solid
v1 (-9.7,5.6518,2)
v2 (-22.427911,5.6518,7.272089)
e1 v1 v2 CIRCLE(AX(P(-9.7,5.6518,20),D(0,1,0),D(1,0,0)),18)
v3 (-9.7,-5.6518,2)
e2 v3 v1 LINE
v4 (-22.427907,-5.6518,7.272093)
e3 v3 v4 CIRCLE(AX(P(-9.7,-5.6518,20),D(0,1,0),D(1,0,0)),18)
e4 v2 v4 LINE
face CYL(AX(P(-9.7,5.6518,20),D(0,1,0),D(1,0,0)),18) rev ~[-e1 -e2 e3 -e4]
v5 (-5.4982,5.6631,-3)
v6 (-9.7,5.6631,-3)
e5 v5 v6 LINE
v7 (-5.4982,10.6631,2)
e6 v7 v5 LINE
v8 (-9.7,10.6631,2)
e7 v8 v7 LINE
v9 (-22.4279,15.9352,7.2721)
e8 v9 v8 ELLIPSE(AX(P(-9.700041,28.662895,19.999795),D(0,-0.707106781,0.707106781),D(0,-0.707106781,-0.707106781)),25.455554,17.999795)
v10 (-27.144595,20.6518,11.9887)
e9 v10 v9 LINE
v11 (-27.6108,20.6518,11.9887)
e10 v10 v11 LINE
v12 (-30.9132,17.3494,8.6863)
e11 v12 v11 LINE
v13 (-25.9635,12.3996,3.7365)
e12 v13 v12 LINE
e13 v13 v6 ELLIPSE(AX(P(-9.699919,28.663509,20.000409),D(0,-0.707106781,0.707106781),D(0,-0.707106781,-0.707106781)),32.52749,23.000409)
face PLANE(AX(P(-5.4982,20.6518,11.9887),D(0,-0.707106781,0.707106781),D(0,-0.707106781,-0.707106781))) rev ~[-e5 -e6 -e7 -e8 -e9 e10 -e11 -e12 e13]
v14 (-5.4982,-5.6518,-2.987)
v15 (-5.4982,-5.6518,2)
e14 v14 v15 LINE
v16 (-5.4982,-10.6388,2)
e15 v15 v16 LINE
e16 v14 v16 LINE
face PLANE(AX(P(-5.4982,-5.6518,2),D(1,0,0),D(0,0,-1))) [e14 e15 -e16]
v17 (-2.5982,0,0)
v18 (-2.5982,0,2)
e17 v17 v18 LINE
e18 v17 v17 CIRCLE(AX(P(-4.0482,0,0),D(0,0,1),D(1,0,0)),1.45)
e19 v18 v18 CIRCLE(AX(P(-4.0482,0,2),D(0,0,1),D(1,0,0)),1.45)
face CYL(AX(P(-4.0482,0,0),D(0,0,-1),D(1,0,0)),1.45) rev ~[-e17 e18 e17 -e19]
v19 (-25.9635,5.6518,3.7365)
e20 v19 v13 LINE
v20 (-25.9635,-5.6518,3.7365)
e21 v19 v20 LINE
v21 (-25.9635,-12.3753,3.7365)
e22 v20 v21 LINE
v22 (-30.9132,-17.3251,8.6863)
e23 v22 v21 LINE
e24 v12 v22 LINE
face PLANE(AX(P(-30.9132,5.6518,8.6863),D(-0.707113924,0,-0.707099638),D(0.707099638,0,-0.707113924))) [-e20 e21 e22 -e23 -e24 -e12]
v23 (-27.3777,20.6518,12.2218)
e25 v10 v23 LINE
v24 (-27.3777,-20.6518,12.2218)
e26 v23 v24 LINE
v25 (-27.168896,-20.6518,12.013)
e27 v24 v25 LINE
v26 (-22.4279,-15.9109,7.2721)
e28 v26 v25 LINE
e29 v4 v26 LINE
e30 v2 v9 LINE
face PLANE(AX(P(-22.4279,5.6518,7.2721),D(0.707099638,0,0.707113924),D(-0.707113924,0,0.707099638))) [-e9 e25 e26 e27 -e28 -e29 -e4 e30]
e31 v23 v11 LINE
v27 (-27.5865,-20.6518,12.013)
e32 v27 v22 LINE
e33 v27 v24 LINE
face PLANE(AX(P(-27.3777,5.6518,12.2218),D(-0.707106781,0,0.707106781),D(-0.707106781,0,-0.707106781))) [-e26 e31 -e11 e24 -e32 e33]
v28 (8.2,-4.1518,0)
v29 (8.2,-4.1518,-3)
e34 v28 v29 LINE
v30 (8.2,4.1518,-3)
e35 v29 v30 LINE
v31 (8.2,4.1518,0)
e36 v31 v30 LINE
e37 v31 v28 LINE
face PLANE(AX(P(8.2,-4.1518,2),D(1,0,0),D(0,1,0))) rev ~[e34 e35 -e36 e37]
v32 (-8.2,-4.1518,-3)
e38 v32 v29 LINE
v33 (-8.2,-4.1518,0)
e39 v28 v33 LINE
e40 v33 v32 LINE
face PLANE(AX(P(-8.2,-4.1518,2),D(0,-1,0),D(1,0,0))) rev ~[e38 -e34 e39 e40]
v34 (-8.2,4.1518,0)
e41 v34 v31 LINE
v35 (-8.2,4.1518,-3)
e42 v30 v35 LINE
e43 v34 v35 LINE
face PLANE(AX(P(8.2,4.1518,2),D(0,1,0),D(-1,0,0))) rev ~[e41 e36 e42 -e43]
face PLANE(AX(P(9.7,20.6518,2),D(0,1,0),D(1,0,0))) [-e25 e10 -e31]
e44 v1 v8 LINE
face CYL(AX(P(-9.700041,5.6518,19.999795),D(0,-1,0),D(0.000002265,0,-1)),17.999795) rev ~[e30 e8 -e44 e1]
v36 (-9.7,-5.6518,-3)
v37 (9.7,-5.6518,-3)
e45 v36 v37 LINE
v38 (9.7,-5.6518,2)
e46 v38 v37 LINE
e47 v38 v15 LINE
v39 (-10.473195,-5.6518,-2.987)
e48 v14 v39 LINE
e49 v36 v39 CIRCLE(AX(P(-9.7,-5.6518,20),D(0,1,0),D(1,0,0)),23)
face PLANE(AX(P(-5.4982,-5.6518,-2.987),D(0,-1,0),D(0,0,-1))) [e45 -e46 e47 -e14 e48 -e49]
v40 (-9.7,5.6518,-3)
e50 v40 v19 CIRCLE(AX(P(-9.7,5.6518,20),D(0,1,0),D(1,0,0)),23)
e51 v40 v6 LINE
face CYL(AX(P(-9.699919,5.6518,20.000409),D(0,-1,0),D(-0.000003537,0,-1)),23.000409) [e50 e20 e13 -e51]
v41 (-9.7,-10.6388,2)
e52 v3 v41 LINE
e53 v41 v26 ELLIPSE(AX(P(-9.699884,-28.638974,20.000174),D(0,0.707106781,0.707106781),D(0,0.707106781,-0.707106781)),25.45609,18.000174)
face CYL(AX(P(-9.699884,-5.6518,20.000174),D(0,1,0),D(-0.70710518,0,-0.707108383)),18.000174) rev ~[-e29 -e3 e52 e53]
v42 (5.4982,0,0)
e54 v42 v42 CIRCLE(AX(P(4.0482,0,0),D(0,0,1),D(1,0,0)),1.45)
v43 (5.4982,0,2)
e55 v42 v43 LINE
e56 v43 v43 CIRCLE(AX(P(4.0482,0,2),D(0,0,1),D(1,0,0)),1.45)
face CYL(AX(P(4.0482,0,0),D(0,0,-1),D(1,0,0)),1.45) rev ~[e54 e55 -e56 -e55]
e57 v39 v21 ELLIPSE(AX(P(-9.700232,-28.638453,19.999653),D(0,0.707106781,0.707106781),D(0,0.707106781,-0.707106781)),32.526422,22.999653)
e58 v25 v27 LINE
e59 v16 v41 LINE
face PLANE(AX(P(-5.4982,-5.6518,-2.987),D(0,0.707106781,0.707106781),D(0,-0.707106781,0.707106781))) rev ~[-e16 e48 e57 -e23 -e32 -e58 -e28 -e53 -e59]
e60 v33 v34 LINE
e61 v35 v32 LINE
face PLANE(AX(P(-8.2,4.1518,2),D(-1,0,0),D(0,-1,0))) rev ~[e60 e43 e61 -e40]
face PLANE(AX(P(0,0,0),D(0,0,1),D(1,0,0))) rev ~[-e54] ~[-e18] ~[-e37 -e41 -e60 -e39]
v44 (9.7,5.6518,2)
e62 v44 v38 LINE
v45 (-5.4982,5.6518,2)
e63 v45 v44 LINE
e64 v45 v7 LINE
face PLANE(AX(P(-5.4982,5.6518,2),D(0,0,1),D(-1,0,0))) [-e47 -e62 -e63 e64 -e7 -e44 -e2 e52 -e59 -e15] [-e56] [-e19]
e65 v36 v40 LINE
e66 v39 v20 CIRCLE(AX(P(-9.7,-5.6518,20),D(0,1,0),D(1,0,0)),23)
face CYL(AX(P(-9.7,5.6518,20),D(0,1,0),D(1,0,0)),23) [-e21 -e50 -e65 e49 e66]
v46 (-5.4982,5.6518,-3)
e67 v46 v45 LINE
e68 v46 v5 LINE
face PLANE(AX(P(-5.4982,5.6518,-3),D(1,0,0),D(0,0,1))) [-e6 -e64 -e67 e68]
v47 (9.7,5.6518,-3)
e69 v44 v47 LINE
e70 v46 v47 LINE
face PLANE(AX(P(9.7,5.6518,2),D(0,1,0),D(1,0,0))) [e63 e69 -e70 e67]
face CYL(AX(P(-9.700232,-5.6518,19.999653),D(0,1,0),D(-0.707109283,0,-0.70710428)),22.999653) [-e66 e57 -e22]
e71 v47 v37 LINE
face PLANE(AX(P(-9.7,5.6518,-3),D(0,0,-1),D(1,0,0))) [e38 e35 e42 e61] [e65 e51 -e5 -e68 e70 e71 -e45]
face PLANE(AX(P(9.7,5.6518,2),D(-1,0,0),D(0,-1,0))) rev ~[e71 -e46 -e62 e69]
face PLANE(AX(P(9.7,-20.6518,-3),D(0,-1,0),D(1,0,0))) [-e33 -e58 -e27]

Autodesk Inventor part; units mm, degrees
ref_plane "YZ Plane" through (0, 0, 0) normal (1, 0, 0) x (0, 1, 0)
ref_plane "XZ Plane" through (0, 0, 0) normal (0, 1, 0) x (-1, 0, 0)
sketch "Sketch1" plane through (0, 0, 0) normal (0, 0, 1) x (1, 0, 0)
  circle A0 centre (-4.0482, 0) radius 1.45 projected
  circle A1 centre (4.0482, 0) radius 1.45 projected
  line L0 (-8, 3.9518) -> (-8, -3.9518) projected
  line L1 (-8, -3.9518) -> (8, -3.9518) projected
  line L2 (8, -3.9518) -> (8, 3.9518) projected
  line L3 (8, 3.9518) -> (-8, 3.9518) projected
  line L4 (8.2, 4.1518) -> (8.2, -4.1518)
  line L5 (8.2, -4.1518) -> (-8.2, -4.1518)
  line L6 (-8.2, -4.1518) -> (-8.2, 4.1518)
  line L7 (-8.2, 4.1518) -> (8.2, 4.1518)
  point P0 (0, 0)
  dimension "d0" = 0.2
extrude "Extrusion1" add sketch "Sketch1" along normal blind 2 contours L3 L2 L1 L0 | L4 L5 L6 L7
sketch "Sketch2" plane through (0, 0, 2) normal (0, 0, 1) x (1, 0, 0)
  line L0 (8.2, -4.1518) -> (8.2, 4.1518) projected
  line L1 (8.2, 4.1518) -> (-8.2, 4.1518) projected
  line L2 (-8.2, 4.1518) -> (-8.2, -4.1518) projected
  line L3 (-8.2, -4.1518) -> (8.2, -4.1518) projected
  line L4 (9.7, 5.6518) -> (9.7, -5.6518)
  line L5 (9.7, -5.6518) -> (-9.7, -5.6518)
  line L6 (-9.7, -5.6518) -> (-9.7, 5.6518)
  line L7 (-9.7, 5.6518) -> (9.7, 5.6518)
  point P0 (0, 0)
  dimension "d3" = 1.5
ref_plane "Work Plane1" through (7.9977, -5.9583, -3) normal (0, 0, 1) x (1, 0, 0)
extrude "Extrusion2" add sketch "Sketch2" against normal up to surface (5 mm away)
sketch "Sketch3" plane through (-9.7, 5.6518, 2) normal (0, 1, 0) x (1, 0, 0)
  line L0 (0, 0) -> (0, 5) projected
  line L1 (0, 0) -> (0, -18)
  circle A0 centre (0, -18) radius 18
  circle A1 centre (0, -18) radius 23
  line L2 (0, -18) -> (-16.2635, -1.7365)
  line L3 (0, -18) -> (23, -18) construction
  point P0 (9.7, 2)
  point P1 (-12.7279, -5.2721)
  dimension "d6" = 18
  dimension "d7" = 135
extrude "Extrusion3" add sketch "Sketch3" against normal up to surface (11.3036 mm away) contours A0 L2 A1 L0 picked at (-13.0139, -1.2154)
sketch "Sketch5" plane through (9.7, 5.6518, 2) normal (0, 1, 0) x (1, 0, 0)
  line L0 (-35.6635, -1.7365) -> (-32.1279, -5.2721) projected
  line L1 (-35.6635, -1.7365) -> (-32.1279, -5.2721)
  line L2 (-32.1279, -5.2721) -> (-37.0777, -10.2218)
  line L3 (-37.0777, -10.2218) -> (-40.6132, -6.6863)
  line L4 (-40.6132, -6.6863) -> (-35.6635, -1.7365)
  point P0 (-9.7, 2)
  dimension "d10" = 7
extrude "Extrusion4" add sketch "Sketch5" against normal up to surface (11.3036 mm away)
sketch "Sketch6" plane through (9.7, -5.6518, -3) normal (0, -1, 0) x (1, 0, 0)
  line L0 (-37.0777, 15.2218) -> (-32.1279, 10.2721) projected
  arc A0 (-32.1279, 10.2721) -> (-19.4, 5) centre (-19.4, 23) ccw projected
  line L1 (-40.6132, 11.6863) -> (-37.0777, 15.2218) projected
  line L2 (-35.6635, 6.7365) -> (-40.6132, 11.6863) projected
  arc A1 (-35.6635, 6.7365) -> (-19.4, 0) centre (-19.4, 23) ccw projected
  line L3 (-19.4, 5) -> (0, 5) projected
  line L4 (0, 0) -> (-19.4, 0) projected
  line L5 (-15.1982, 5) -> (-15.1982, 3) projected
  line L6 (-15.1982, 5) -> (-15.1982, 0)
  point P0 (-9.7, 3)
extrude "Extrusion5" add sketch "Sketch6" along normal blind 15
sketch "Sketch7" plane through (9.7, 5.6518, 2) normal (0, 1, 0) x (1, 0, 0)
  line L0 (-32.1279, -5.2721) -> (-37.0777, -10.2218) projected
  line L1 (-37.0777, -10.2218) -> (-40.6132, -6.6863) projected
  line L2 (-40.6132, -6.6863) -> (-35.6635, -1.7365) projected
  arc A0 (-19.4, 5) -> (-35.6635, -1.7365) centre (-19.4, -18) ccw projected
  line L3 (-19.4, 5) -> (-15.1982, 5) projected
  line L4 (-15.1982, 5) -> (-15.1982, 0) projected
  line L5 (-15.1982, 0) -> (-19.4, 0) projected
  arc A1 (-19.4, 0) -> (-32.1279, -5.2721) centre (-19.4, -18) ccw projected
  point P0 (-9.7, 2)
extrude "Extrusion6" add sketch "Sketch7" along normal blind 15
sketch "Sketch8" plane through (-5.4982, 5.6518, 2) normal (1, 0, 0) x (0, 0, -1)
  line L0 (-43.306, 51.1457) -> (8.0398, -0.2) projected
  line L1 (8.0154, -11.1036) -> (-43.306, -62.425) projected
  line L2 (-44.7202, 49.7315) -> (6.6255, -1.6142)
  line L3 (6.6012, -9.6894) -> (-44.7202, -61.0108)
  line L4 (5, 0) -> (5, 15) projected
  line L5 (-10.2218, 15) -> (-5.2721, 15) projected
  line L6 (-5.2721, 15) -> (0, 15) projected
  line L7 (0, 15) -> (5, 15) projected
  line L8 (5, -11.3036) -> (5, -26.3036) projected
  line L9 (5, -26.3036) -> (0, -26.3036) projected
  line L10 (0, -26.3036) -> (-5.2721, -26.3036) projected
  line L11 (-5.2721, -26.3036) -> (-10.2218, -26.3036) projected
  line L12 (0, -11.3036) -> (5, -11.3036) projected
  point P0 (2, -5.6518)
  point P1 (-9.9887, 15)
  point P2 (5, 0.0113)
  point P3 (4.987, -11.3036)
  point P4 (-10.013, -26.3036)
  dimension "d17" = 2
  dimension "d18" = 2
extrude "Extrusion7" cut sketch "Sketch8" against normal through all
properties part number "KickerFoot_3DPrint"
